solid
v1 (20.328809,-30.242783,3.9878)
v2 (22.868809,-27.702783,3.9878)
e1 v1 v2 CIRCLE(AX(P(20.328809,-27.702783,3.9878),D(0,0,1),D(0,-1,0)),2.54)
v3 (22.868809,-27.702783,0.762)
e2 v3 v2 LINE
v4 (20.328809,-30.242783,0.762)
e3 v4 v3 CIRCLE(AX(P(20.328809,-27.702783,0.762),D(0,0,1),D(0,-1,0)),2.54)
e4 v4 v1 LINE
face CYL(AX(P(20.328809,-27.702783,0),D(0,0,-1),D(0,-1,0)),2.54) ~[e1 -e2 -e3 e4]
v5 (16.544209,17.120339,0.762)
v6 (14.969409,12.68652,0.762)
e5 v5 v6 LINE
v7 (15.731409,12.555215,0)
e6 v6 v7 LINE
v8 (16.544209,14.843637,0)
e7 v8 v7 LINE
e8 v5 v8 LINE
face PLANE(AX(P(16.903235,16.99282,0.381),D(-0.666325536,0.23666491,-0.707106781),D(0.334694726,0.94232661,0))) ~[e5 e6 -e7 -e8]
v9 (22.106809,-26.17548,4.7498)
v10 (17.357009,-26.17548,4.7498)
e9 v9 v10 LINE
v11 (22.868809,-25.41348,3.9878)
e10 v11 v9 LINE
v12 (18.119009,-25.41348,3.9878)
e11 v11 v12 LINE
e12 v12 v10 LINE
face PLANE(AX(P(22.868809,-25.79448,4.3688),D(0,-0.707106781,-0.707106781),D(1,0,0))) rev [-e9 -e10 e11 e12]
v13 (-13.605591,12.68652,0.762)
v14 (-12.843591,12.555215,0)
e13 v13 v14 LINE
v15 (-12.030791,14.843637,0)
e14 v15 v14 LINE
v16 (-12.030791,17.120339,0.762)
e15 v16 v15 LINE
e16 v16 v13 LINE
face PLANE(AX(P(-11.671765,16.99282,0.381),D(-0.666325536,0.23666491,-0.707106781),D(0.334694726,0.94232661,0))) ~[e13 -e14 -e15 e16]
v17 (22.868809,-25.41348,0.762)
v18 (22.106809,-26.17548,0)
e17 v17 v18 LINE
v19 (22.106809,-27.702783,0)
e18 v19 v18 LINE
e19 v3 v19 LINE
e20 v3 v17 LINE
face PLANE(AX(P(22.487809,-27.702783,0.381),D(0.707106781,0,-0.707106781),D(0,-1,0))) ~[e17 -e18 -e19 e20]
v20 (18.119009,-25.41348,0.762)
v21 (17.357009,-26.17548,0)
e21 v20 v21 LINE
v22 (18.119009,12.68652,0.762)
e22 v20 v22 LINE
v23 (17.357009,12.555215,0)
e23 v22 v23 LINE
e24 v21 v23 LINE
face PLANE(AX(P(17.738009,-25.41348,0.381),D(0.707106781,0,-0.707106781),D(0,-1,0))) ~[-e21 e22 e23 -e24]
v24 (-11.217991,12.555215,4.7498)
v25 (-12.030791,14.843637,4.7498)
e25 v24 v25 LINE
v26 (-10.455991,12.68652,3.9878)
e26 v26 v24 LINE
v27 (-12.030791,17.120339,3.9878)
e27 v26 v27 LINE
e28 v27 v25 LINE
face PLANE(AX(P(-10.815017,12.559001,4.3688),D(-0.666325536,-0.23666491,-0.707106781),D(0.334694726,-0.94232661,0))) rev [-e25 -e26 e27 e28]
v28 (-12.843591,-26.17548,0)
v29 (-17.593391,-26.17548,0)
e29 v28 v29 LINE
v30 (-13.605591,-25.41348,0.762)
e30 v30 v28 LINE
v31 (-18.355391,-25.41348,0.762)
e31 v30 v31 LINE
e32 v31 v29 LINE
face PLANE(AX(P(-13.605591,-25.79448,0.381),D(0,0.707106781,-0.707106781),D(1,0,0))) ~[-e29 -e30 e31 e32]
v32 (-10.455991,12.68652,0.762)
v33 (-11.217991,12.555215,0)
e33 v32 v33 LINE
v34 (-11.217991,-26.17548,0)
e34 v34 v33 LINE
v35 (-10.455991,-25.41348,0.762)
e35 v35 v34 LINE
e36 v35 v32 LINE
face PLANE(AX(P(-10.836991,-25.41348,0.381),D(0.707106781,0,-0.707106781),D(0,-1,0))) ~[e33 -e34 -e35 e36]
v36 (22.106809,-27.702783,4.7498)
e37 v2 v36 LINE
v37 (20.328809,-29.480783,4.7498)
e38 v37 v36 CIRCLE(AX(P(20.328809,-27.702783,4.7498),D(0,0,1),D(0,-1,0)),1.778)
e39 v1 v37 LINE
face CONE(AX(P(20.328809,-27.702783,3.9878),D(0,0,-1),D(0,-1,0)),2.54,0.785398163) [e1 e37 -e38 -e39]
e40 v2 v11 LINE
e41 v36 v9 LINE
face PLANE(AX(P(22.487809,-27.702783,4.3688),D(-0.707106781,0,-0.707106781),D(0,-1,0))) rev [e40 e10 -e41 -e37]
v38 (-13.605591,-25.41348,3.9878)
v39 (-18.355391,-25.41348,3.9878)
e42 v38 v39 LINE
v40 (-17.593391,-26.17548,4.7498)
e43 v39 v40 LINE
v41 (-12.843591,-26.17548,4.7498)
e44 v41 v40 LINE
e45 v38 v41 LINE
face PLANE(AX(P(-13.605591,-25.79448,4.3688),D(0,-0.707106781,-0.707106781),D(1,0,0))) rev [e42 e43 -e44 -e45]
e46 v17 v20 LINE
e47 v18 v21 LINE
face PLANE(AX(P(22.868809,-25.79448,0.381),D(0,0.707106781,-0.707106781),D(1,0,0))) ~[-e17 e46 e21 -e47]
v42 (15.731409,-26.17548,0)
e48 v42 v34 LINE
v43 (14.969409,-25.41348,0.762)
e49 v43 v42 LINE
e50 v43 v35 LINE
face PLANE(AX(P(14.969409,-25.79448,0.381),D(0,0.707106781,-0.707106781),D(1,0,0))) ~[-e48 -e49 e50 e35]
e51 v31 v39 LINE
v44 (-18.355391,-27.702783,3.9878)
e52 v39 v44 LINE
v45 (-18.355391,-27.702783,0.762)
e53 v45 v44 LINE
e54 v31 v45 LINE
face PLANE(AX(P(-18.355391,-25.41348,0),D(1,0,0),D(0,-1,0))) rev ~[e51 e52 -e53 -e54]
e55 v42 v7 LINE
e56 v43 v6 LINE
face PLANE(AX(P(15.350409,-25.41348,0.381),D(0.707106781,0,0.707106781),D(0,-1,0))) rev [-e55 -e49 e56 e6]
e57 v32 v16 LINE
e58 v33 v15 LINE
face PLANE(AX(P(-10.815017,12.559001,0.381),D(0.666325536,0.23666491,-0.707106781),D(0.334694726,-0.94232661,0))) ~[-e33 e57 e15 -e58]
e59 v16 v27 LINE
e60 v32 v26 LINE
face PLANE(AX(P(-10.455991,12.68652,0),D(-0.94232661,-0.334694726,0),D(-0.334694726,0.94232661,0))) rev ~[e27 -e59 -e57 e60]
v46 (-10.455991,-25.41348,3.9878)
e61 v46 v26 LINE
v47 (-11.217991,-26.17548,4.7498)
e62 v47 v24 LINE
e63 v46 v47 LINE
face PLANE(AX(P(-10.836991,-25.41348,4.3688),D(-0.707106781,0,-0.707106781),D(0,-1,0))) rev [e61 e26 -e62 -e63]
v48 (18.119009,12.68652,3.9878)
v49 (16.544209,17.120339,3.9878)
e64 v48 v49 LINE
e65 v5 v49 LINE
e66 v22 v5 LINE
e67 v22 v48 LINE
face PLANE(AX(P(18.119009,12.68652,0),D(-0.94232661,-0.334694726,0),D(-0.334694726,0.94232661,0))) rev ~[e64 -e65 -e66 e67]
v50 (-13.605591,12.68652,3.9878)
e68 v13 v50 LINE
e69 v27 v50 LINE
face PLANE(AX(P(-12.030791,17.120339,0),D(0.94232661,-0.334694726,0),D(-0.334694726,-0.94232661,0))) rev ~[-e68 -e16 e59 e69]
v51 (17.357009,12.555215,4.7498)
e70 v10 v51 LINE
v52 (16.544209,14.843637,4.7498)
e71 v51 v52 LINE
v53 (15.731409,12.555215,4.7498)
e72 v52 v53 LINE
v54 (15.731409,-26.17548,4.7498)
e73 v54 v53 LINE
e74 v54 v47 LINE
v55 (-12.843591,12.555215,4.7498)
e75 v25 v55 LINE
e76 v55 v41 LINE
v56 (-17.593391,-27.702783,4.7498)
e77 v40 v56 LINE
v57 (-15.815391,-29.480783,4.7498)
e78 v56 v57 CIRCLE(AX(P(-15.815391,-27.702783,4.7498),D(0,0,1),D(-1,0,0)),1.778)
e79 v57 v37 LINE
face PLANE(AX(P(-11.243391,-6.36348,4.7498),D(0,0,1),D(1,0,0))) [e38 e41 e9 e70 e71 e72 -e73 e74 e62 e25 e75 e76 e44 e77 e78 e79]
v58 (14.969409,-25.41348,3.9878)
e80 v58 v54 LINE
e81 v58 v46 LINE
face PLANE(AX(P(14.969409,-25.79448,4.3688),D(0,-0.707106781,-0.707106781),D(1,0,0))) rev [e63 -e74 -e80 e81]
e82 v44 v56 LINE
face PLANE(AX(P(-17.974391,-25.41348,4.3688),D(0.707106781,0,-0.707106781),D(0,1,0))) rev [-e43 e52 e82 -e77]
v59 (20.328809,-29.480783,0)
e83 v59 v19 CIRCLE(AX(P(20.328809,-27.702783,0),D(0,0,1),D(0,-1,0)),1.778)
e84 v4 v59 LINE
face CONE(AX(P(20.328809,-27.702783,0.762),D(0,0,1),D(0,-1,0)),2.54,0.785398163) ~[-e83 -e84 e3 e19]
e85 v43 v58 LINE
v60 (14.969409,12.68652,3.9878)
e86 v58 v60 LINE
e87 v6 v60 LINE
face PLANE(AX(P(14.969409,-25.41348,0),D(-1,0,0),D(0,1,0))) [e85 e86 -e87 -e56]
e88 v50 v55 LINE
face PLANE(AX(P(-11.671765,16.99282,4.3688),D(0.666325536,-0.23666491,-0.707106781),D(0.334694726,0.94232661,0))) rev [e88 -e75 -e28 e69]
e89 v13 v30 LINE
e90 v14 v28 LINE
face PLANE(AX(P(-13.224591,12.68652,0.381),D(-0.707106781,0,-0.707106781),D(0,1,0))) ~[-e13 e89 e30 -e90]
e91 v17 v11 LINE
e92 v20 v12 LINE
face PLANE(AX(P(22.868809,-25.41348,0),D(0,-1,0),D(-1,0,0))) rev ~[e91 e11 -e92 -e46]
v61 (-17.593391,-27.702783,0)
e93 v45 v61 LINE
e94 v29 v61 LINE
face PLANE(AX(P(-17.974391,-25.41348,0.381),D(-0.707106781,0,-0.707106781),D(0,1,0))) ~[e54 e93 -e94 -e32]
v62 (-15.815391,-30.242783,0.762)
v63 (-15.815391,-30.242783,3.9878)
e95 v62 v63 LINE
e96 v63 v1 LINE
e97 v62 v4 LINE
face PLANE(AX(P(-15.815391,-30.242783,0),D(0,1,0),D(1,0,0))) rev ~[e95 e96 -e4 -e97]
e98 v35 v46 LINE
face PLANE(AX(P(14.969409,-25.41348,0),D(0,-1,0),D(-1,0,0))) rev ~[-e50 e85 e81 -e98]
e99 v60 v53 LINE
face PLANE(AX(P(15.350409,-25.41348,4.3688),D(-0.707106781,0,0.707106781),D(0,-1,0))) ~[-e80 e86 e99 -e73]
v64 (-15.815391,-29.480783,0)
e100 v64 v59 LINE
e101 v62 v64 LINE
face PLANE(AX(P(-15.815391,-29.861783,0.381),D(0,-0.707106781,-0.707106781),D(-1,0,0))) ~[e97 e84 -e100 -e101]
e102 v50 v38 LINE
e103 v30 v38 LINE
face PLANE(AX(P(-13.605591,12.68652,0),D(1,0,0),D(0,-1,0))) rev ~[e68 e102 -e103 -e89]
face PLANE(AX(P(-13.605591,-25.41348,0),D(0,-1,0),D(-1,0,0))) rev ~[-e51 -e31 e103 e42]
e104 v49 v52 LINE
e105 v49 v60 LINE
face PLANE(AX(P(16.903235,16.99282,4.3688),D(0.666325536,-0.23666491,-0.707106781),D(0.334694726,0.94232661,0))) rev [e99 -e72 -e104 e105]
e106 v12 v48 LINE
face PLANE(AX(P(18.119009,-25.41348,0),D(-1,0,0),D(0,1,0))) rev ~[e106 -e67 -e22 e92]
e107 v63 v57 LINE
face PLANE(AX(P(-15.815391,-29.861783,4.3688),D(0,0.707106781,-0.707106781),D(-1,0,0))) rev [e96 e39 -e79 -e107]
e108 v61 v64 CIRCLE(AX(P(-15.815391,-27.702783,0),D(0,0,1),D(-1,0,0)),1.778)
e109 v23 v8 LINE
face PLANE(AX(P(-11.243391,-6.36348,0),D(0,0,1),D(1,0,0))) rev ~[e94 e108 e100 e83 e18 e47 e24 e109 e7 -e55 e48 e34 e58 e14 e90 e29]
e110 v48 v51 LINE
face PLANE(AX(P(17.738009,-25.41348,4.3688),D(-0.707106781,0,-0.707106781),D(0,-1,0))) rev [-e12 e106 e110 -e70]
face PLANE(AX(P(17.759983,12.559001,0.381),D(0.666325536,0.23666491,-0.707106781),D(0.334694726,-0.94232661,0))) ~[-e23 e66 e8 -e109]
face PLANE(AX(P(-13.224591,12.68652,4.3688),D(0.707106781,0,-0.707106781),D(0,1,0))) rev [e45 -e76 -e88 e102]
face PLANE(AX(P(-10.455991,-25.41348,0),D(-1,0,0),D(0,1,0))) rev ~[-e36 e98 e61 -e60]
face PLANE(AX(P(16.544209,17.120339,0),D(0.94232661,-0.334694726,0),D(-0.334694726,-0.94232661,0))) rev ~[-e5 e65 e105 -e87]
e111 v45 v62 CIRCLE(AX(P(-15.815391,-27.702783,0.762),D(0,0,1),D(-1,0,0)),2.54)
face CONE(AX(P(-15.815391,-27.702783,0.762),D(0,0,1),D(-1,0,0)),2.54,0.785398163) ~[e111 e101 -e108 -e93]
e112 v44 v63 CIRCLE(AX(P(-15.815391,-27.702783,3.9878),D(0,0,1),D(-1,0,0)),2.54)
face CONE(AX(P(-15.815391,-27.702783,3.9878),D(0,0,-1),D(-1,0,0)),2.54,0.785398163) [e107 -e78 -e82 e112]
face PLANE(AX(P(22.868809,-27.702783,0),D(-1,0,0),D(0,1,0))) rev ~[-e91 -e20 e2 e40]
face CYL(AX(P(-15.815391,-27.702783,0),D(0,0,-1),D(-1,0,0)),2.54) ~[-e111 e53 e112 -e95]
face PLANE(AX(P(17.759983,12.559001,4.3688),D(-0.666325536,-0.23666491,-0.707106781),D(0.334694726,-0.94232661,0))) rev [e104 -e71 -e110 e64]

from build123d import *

# Parameters (mm, degrees)
F0_W     = 1.5748
F0_H     = 38.1
F1_DEPTH = 4.7498
F2_SIZE  = 0.762


# Not quite as in the source:
# - a feature names something its author has since deleted; it is built from what else it names


with BuildPart() as f1:
    # F0 (on Top) → F1 (new body)
    with BuildSketch(Plane.XY):
        with Locations((-11.2433909576, -6.3634803519)):
            Rectangle(F0_W, F0_H)
        with BuildLine():
            Line((-10.4559909576, -25.4134803519), (-12.0307909576, -25.4134803519))
            Line((-12.0307909576, -25.4134803519), (-12.0307909576, 12.6865196481))
            Line((-12.0307909576, 12.6865196481), (-12.0307909576, 17.1203389764))
            Line((-12.0307909576, 17.1203389764), (-13.6055909576, 12.6865196481))
            Line((-13.6055909576, 12.6865196481), (-13.6055909576, -25.4134803519))
            Line((-13.6055909576, -25.4134803519), (-18.3553909576, -25.4134803519))
            Line((-18.3553909576, -25.4134803519), (-18.3553909576, -27.7027830635))
            ThreePointArc((-18.3553909576, -27.7027830635), (-17.6114421818, -29.4988342878), (-15.8153909576, -30.2427830635))
            Line((-15.8153909576, -30.2427830635), (20.3288090424, -30.2427830635))
            ThreePointArc((20.3288090424, -30.2427830635), (22.1248602666, -29.4988342878), (22.8688090424, -27.7027830635))
            Line((22.8688090424, -27.7027830635), (22.8688090424, -25.4134803519))
            Line((22.8688090424, -25.4134803519), (18.1190090424, -25.4134803519))
            Line((18.1190090424, -25.4134803519), (18.1190090424, 12.6865196481))
            Line((18.1190090424, 12.6865196481), (16.5442090424, 17.1203389764))
            Line((16.5442090424, 17.1203389764), (16.5442090424, 12.6865196481))
            Line((16.5442090424, 12.6865196481), (16.5442090424, -25.4134803519))
            Line((16.5442090424, -25.4134803519), (14.9694090424, -25.4134803519))
            Line((14.9694090424, -25.4134803519), (-10.4559909576, -25.4134803519))
        make_face()
        with Locations((15.7568090424, -6.3634803519)):
            Rectangle(F0_W, F0_H)
        Polygon((-12.0307909576, 17.1203389764), (-12.0307909576, 12.6865196481), (-10.4559909576, 12.6865196481), align=None)
        Polygon((16.5442090424, 17.1203389764), (14.9694090424, 12.6865196481), (16.5442090424, 12.6865196481), align=None)
    extrude(amount=F1_DEPTH)

    # F2
    f2_edges = [f1.edges().sort_by_distance(p)[0] for p in [
        (-13.605591, -6.36348, 4.7498),
        (-10.455991, -6.36348, 4.7498),
        (-11.243391, 14.903429, 4.7498),
        (-12.818191, 14.903429, 4.7498),
        (-15.980491, -25.41348, 4.7498),
        (-18.355391, -26.558132, 4.7498),
        (-17.611442, -29.498834, 4.7498),
        (2.256709, -30.242783, 4.7498),
        (22.12486, -29.498834, 4.7498),
        (22.868809, -26.558132, 4.7498),
        (20.493909, -25.41348, 4.7498),
        (18.119009, -6.36348, 4.7498),
        (17.331609, 14.903429, 4.7498),
        (15.756809, 14.903429, 4.7498),
        (14.969409, -6.36348, 4.7498),
        (2.256709, -25.41348, 4.7498),
        (-10.455991, -6.36348, 0),
        (-11.243391, 14.903429, 0),
        (-12.818191, 14.903429, 0),
        (-13.605591, -6.36348, 0),
        (-15.980491, -25.41348, 0),
        (-18.355391, -26.558132, 0),
        (-17.611442, -29.498834, 0),
        (2.256709, -30.242783, 0),
        (22.12486, -29.498834, 0),
        (22.868809, -26.558132, 0),
        (20.493909, -25.41348, 0),
        (18.119009, -6.36348, 0),
        (17.331609, 14.903429, 0),
        (15.756809, 14.903429, 0),
        (14.969409, -6.36348, 0),
        (2.256709, -25.41348, 0),
    ]]
    chamfer(f2_edges, length=F2_SIZE)


solid = f1.part
